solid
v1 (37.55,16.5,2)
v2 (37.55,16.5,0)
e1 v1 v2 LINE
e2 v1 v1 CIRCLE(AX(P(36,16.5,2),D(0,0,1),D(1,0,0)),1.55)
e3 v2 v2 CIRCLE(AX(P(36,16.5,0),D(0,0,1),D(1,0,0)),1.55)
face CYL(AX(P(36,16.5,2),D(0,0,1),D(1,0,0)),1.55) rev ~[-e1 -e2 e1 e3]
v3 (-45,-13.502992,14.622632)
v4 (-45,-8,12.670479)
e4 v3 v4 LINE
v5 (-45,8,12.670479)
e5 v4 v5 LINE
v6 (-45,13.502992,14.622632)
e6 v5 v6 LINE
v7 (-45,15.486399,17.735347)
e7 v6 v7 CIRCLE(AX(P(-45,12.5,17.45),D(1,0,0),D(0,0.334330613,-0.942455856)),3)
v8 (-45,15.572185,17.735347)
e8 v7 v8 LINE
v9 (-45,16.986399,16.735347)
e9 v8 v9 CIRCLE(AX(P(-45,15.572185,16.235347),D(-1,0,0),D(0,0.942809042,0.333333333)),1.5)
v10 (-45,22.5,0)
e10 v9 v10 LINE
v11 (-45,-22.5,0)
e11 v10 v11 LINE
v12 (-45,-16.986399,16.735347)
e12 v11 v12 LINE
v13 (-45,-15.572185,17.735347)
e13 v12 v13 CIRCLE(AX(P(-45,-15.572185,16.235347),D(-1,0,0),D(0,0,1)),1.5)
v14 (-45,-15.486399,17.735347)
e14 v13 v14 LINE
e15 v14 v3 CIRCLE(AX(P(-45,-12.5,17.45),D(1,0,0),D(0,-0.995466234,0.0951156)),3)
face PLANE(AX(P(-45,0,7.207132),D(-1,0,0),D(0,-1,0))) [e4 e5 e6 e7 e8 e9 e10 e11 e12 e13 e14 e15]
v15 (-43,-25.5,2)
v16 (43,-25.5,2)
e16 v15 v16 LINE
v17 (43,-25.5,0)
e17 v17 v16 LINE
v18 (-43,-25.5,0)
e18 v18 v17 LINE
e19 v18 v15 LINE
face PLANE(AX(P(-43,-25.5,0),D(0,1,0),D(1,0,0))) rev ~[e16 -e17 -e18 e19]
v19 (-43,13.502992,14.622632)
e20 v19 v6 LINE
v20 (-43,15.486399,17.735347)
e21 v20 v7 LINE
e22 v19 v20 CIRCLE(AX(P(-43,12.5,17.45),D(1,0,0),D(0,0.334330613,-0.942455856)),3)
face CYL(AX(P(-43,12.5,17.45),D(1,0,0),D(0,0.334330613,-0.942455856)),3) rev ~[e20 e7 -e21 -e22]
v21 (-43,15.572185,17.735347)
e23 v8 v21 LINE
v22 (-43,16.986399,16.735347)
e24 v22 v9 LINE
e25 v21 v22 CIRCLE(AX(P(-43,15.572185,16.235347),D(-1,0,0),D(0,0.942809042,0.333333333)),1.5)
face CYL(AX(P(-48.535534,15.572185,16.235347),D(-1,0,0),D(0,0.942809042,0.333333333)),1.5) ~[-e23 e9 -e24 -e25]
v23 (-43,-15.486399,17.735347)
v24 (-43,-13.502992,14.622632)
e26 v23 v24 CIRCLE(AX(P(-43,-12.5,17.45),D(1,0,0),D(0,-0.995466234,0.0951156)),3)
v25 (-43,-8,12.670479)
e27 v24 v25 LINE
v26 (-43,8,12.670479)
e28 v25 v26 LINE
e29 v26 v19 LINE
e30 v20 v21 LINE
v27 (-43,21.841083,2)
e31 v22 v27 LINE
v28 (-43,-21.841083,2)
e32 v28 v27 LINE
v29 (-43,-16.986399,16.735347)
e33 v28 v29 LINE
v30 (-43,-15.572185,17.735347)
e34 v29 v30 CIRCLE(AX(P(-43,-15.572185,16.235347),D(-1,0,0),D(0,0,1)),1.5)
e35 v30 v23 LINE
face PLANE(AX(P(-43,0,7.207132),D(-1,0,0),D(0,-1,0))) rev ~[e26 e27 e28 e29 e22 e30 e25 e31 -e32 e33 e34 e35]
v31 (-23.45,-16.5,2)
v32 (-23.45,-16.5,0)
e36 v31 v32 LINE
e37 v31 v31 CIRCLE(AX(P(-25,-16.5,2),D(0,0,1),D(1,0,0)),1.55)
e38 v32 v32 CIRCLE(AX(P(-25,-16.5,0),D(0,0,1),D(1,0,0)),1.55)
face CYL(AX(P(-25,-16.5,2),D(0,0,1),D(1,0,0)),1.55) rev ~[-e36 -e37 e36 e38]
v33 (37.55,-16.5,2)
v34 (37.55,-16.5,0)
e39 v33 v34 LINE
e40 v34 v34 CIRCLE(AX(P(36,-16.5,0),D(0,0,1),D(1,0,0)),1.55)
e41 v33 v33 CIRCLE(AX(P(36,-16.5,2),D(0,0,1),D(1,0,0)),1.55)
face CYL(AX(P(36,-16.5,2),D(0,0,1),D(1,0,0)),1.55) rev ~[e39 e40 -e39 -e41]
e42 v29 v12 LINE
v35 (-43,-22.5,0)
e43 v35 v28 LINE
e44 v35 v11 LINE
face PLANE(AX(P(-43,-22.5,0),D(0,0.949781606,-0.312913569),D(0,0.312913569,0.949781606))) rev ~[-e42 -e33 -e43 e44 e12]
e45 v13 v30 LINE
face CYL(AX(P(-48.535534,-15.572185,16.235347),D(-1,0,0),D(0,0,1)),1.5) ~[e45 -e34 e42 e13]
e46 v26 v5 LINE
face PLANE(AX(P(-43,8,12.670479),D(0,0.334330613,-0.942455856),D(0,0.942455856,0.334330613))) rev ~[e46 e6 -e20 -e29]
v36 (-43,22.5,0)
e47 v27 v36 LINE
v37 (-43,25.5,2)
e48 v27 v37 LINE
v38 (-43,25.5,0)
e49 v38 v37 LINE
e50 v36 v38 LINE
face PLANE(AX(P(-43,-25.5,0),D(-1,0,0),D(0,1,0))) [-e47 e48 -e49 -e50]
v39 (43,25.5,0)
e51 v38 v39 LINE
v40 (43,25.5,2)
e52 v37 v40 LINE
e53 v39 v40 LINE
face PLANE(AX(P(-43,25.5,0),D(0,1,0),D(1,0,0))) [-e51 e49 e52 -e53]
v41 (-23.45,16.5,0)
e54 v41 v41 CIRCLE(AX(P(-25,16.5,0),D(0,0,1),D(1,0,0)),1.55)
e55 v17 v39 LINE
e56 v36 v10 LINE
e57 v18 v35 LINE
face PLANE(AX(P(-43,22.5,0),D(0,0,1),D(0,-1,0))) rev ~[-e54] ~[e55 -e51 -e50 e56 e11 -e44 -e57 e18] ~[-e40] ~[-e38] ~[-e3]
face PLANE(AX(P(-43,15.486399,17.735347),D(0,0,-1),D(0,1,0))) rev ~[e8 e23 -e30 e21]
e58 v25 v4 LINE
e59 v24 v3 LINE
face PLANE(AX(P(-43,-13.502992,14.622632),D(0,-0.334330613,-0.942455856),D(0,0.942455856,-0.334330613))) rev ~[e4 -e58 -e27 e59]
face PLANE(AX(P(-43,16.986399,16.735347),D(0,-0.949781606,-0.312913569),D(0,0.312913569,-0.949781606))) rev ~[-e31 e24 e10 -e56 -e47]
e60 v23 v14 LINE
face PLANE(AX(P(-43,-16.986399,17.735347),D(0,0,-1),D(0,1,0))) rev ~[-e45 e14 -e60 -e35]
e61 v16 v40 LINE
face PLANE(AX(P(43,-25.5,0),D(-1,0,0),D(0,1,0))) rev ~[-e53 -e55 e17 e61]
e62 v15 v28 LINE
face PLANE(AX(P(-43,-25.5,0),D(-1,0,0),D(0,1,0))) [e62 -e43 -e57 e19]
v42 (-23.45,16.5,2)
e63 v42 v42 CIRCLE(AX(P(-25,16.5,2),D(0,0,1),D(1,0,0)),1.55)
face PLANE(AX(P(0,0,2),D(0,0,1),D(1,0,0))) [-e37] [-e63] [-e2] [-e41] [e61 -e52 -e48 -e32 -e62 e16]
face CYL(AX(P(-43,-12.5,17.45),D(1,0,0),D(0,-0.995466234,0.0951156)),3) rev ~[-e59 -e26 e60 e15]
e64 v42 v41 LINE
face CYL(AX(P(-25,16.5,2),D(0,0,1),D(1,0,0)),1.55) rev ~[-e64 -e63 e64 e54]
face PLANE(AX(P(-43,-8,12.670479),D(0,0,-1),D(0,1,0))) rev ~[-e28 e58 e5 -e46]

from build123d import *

# Parameters (mm, degrees)
F0_W        = 86
F0_H        = 51
F1_DEPTH    = 2
F3_R        = 1.55
F4_DEPTH    = 25.4
F5_DEPTH    = 2
F6_T1_DEPTH = 9.0710678119


# Not quite as in the source:
# - a fillet or chamfer that OpenCascade refuses, or shapes differently, is made with other operations: its cross-section is extruded or revolved along the edge and cut away or added


with BuildPart() as f1:
    # F0 (on Top) → F1 (new body)
    with BuildSketch(Plane.XY):
        Rectangle(F0_W, F0_H)
    extrude(amount=F1_DEPTH)

    # F3 (on face) → F4 (cut)
    with BuildSketch(Plane.XY.offset(2)):
        with Locations((-25, 16.5)):
            Circle(F3_R)
        with Locations((-25, -16.5)):
            Circle(F3_R)
        with Locations((36, 16.5)):
            Circle(F3_R)
        with Locations((36, -16.5)):
            Circle(F3_R)
    extrude(amount=-F4_DEPTH, mode=Mode.SUBTRACT)

    # F2 (on face) → F5 (join)
    with BuildSketch(Plane(origin=(-43, 0, 0), x_dir=(0, -1, 0), z_dir=(-1, 0, 0))):
        with BuildLine():
            Line((8, 12.6704787835), (0, 12.6704787835))
            Line((0, 12.6704787835), (-8, 12.6704787835))
            Line((-8, 12.6704787835), (-13.5029918403, 14.6226324313))
            ThreePointArc((-13.5029918403, 14.6226324313), (-15.0300310094, 15.8378762171), (-15.4863987014, 17.7353468))
            Line((-15.4863987014, 17.7353468), (-16.9863987014, 17.7353468))
            Line((-16.9863987014, 17.7353468), (-16.9863987014, 16.7353468))
            Line((-16.9863987014, 16.7353468), (-22.5, 0))
            Line((-22.5, 0), (22.5, 0))
            Line((22.5, 0), (16.9863987014, 16.7353468))
            Line((16.9863987014, 16.7353468), (16.9863987014, 17.7353468))
            Line((16.9863987014, 17.7353468), (15.4863987014, 17.7353468))
            ThreePointArc((15.4863987014, 17.7353468), (15.0300310094, 15.8378762171), (13.5029918403, 14.6226324313))
            Line((13.5029918403, 14.6226324313), (8, 12.6704787835))
        make_face()
        with BuildLine():
            Line((8, 12.6704787835), (0, 12.6704787835))
            Line((0, 12.6704787835), (-8, 12.6704787835))
            Line((-8, 12.6704787835), (-13.5029918403, 14.6226324313))
            ThreePointArc((-13.5029918403, 14.6226324313), (-15.0300310094, 15.8378762171), (-15.4863987014, 17.7353468))
            Line((-15.4863987014, 17.7353468), (-16.9863987014, 17.7353468))
            Line((-16.9863987014, 17.7353468), (-16.9863987014, 16.7353468))
            Line((-16.9863987014, 16.7353468), (-21.8410831141, 2))
            Line((-21.8410831141, 2), (21.8410831141, 2))
            Line((21.8410831141, 2), (16.9863987014, 16.7353468))
            Line((16.9863987014, 16.7353468), (16.9863987014, 17.7353468))
            Line((16.9863987014, 17.7353468), (15.4863987014, 17.7353468))
            ThreePointArc((15.4863987014, 17.7353468), (15.0300310094, 15.8378762171), (13.5029918403, 14.6226324313))
            Line((13.5029918403, 14.6226324313), (8, 12.6704787835))
        make_face()
    extrude(amount=F5_DEPTH)

    # F6: fillet of radius 1.5 on 2 edges, made by hand

    # F6_s2 → F6_t1 (cut)
    with BuildSketch(Plane.YZ.offset(-48.5355339059)):
        with BuildLine():
            ThreePointArc((-15.572185139, 17.7353468), (-16.4382105428, 17.4600916714), (-16.9863987014, 16.7353468))
            Line((-16.9863987014, 16.7353468), (-16.9863987014, 17.7353468))
            Line((-16.9863987014, 17.7353468), (-15.572185139, 17.7353468))
        make_face()
        with BuildLine():
            ThreePointArc((16.9863987014, 16.7353468), (16.4382105428, 17.4600916714), (15.572185139, 17.7353468))
            Line((15.572185139, 17.7353468), (16.9863987014, 17.7353468))
            Line((16.9863987014, 17.7353468), (16.9863987014, 16.7353468))
        make_face()
    extrude(amount=F6_T1_DEPTH, mode=Mode.SUBTRACT)


solid = f1.part
